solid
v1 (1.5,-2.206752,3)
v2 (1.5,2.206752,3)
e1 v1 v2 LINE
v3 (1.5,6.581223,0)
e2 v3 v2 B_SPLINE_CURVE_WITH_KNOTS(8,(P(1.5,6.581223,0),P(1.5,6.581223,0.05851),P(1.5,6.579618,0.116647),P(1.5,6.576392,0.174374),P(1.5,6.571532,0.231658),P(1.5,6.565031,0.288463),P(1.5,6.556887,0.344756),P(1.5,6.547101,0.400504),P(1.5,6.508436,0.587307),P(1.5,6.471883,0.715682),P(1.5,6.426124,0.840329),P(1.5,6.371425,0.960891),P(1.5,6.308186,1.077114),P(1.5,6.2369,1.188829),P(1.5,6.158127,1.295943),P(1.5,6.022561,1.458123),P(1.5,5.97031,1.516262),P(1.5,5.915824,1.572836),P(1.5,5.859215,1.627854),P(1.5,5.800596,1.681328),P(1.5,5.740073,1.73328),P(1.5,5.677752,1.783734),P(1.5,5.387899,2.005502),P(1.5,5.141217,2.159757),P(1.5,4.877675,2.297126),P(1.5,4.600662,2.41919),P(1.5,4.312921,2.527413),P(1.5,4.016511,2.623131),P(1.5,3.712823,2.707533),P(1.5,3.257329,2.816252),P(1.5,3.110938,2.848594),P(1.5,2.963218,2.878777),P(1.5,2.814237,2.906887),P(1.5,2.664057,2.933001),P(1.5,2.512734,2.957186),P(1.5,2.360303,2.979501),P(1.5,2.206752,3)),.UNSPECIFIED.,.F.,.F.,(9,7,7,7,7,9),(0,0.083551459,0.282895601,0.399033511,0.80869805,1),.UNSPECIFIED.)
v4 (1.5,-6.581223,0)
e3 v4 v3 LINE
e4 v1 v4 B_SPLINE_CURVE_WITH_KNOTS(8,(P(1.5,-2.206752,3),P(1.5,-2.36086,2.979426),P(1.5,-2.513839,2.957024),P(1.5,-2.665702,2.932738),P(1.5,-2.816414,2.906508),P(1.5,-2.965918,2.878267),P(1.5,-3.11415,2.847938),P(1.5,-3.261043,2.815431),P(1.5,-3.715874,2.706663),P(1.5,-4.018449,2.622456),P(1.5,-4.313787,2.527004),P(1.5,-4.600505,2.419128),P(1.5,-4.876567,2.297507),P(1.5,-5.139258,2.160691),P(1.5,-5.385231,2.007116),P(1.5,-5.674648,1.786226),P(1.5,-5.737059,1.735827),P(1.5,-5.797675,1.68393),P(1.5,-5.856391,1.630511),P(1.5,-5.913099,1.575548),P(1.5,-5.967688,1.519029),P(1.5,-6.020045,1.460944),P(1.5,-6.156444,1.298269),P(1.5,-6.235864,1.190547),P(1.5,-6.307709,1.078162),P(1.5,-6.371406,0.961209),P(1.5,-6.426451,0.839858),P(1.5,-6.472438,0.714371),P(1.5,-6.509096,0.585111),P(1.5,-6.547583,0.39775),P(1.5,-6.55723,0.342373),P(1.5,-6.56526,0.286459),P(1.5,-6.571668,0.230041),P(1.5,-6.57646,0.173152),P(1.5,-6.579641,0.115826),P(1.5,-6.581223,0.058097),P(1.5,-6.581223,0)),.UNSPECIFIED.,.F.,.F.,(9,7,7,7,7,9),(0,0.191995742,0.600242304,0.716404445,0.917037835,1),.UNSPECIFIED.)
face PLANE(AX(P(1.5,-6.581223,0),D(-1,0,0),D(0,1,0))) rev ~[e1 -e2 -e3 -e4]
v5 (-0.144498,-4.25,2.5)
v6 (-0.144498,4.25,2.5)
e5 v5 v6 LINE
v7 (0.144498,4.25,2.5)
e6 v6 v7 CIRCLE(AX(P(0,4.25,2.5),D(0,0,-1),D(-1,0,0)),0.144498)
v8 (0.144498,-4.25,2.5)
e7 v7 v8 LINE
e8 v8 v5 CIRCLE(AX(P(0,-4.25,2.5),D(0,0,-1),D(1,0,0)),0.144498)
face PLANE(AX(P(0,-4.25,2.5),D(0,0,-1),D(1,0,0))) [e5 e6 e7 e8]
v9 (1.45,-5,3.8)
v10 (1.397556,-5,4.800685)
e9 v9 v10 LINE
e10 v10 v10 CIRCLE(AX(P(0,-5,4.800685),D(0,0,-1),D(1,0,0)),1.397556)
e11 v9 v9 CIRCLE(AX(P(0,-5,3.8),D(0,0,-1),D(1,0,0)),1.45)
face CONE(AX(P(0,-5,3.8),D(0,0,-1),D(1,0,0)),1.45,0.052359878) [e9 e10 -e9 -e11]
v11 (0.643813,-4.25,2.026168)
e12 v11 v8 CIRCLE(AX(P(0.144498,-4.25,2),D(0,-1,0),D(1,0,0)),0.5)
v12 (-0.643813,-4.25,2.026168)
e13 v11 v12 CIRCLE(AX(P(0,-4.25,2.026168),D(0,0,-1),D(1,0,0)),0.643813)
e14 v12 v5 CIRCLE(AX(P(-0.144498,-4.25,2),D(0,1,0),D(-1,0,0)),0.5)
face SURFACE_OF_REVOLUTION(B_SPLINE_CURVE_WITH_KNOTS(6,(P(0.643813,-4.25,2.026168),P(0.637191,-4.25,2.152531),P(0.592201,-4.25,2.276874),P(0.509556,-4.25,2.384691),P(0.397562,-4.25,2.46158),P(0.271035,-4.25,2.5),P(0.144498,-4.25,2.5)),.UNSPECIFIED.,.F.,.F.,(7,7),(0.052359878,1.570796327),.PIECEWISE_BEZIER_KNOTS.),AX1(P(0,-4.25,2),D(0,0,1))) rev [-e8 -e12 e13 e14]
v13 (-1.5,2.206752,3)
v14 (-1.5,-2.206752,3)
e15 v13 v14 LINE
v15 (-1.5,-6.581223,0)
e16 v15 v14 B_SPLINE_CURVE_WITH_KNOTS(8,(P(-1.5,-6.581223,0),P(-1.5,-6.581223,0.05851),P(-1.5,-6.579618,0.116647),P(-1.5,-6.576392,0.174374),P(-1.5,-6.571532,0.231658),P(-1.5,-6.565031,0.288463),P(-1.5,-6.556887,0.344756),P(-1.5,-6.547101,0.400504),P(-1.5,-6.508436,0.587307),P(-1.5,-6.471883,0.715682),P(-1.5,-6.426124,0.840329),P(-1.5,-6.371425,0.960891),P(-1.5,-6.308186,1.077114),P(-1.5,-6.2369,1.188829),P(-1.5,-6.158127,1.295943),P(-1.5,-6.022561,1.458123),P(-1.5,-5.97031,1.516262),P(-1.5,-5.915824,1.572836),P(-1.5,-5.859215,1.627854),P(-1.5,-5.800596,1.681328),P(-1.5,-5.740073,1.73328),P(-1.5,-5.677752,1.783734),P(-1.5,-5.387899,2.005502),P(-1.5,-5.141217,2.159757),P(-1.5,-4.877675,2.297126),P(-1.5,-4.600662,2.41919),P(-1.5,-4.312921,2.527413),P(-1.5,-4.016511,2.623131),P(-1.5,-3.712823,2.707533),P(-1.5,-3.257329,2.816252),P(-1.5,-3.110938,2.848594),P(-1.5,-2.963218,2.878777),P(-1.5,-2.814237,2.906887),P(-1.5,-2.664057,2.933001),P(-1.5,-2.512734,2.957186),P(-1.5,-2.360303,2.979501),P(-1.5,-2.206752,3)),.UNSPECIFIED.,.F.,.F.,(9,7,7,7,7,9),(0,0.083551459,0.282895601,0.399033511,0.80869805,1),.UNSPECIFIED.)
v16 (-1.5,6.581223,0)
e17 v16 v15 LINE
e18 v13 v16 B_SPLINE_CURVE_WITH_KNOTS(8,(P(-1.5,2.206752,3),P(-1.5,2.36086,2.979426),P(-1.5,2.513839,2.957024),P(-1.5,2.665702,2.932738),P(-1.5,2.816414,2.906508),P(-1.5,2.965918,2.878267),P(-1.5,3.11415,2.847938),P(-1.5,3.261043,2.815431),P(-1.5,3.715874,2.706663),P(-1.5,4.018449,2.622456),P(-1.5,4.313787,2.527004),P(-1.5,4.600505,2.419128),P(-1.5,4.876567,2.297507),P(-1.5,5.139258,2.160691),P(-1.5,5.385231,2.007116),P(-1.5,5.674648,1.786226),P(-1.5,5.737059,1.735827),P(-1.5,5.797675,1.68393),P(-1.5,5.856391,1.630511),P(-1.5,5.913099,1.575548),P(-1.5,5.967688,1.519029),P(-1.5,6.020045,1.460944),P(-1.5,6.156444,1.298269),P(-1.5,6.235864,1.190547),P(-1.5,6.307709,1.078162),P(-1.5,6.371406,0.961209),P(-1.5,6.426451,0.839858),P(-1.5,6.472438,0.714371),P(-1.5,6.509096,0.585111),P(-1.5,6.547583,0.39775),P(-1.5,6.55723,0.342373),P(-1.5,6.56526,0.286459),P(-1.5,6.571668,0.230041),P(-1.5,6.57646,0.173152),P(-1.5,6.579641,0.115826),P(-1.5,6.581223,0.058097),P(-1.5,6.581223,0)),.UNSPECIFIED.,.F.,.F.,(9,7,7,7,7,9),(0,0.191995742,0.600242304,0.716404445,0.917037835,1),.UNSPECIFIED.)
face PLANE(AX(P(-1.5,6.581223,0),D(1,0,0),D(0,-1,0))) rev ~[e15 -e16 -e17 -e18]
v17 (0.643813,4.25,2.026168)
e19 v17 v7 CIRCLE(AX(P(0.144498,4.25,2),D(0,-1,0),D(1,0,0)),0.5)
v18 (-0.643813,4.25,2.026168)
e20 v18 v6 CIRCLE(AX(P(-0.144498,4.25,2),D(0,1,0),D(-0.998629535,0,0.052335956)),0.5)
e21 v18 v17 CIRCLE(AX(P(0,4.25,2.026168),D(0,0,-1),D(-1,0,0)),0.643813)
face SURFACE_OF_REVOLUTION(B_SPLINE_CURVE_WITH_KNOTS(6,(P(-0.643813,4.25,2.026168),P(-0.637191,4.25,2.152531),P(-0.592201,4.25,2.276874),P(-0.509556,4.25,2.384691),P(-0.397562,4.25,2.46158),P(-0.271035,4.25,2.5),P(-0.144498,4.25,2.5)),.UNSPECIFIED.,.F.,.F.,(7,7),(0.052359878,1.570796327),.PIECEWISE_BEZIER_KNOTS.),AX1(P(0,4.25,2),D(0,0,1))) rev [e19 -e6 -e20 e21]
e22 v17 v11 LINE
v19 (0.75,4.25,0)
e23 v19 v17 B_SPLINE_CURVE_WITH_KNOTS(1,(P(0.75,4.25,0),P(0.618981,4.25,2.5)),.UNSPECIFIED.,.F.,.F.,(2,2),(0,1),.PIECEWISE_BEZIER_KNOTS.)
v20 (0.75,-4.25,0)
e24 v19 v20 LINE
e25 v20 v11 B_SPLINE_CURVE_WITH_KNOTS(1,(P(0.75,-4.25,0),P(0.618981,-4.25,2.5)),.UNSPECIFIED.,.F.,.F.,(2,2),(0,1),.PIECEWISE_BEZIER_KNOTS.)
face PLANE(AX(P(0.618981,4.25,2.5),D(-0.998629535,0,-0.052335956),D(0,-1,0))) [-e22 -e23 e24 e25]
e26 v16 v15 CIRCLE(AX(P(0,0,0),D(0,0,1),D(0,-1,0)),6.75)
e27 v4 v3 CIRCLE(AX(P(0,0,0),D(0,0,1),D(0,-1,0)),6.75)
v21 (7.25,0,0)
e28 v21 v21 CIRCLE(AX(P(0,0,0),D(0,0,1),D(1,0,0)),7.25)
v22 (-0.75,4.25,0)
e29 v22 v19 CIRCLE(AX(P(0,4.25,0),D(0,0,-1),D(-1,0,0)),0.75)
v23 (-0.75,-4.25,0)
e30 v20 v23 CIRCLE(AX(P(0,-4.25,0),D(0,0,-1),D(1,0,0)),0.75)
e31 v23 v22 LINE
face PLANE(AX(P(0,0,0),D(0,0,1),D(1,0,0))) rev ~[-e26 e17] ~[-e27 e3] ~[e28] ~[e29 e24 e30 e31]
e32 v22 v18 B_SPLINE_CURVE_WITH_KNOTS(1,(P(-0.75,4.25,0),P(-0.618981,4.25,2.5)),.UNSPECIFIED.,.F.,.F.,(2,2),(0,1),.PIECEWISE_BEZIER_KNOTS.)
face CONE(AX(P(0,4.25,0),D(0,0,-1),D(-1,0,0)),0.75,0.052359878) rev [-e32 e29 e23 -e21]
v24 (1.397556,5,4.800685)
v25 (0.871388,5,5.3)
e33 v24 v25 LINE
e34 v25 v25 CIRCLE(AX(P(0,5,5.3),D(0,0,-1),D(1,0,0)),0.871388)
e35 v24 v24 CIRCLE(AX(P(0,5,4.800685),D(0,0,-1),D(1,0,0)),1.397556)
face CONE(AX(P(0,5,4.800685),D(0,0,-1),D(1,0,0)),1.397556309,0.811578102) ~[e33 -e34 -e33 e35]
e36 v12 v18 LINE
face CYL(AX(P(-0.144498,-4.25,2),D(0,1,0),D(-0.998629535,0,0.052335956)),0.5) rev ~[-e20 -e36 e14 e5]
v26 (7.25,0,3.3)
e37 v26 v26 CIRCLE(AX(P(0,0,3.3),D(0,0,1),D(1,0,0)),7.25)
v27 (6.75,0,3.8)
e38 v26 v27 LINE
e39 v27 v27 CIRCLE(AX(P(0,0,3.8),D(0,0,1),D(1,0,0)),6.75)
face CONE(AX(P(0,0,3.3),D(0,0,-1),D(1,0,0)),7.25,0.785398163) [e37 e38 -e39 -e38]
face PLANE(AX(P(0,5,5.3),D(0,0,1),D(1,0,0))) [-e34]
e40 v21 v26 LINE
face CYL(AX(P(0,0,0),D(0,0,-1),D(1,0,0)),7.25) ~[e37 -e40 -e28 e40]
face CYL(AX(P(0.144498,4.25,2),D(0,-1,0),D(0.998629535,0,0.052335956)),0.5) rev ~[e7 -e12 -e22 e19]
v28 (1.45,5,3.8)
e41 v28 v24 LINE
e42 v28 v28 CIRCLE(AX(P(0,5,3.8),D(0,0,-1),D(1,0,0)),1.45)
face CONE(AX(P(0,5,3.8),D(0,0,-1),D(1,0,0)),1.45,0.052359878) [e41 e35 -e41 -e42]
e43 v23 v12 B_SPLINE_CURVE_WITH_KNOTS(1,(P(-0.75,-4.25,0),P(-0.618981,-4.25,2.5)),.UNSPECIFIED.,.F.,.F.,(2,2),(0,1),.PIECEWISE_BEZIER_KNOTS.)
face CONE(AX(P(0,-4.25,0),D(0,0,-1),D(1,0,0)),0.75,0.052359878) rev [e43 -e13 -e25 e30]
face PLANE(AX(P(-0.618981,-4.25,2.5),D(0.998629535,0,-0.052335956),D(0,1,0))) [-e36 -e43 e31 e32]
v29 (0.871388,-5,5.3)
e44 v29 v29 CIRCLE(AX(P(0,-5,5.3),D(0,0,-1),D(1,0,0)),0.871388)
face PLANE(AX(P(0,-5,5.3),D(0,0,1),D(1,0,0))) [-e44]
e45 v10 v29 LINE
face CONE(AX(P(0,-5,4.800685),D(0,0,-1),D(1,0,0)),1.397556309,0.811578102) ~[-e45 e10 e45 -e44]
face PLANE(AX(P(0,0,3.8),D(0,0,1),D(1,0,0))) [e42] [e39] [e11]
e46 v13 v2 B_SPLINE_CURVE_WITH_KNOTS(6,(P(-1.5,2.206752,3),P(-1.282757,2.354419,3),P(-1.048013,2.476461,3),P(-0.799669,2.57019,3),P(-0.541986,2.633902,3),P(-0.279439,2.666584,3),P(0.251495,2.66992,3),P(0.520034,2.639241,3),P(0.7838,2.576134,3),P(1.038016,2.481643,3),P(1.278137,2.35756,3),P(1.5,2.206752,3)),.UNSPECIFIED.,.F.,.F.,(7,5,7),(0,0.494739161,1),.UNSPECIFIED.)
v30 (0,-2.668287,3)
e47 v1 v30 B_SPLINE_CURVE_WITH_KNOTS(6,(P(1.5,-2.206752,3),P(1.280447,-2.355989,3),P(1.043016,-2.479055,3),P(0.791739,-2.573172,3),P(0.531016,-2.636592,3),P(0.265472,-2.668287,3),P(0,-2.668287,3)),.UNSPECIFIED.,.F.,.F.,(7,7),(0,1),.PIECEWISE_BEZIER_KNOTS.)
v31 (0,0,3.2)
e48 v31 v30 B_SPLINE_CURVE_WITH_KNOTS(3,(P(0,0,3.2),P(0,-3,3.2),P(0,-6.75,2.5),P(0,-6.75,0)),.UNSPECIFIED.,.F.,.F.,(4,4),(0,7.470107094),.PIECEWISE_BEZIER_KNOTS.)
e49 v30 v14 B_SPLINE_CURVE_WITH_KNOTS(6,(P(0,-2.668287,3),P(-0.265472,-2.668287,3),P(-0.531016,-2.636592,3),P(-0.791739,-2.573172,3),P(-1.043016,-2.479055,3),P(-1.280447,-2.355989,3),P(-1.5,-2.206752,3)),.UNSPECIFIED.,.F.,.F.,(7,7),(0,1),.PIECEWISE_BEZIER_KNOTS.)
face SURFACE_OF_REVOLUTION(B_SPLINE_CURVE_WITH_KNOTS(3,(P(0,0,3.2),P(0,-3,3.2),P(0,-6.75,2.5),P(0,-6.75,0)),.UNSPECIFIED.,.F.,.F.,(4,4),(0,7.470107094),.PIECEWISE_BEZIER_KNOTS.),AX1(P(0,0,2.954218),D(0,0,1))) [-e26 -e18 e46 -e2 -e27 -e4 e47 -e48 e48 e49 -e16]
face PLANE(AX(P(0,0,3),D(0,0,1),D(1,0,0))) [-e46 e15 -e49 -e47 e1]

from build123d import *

# Parameters (mm, degrees)
F0_R      = 7.25
F1_DEPTH  = 3.8
F2_R      = 1.45
F3_DEPTH  = 1.5
F3_TAPER  = 3
F8_DEPTH  = 3
F10_DEPTH = 2.5
F10_TAPER = 3
F11_R     = 0.5
F12_SIZE  = 0.5


# Not quite as in the source:
# - a fillet or chamfer that OpenCascade refuses, or shapes differently, is made with other operations: its cross-section is extruded or revolved along the edge and cut away or added


with BuildPart() as f1:
    # F0 (on Top) → F1 (new body)
    with BuildSketch(Plane.XY):
        Circle(F0_R)
    extrude(amount=F1_DEPTH)

    # F2 (on face) → F3 (join)
    with BuildSketch(Plane.XY.offset(3.8)):
        with Locations((0, 5)):
            Circle(F2_R)
        with Locations((0, -5)):
            Circle(F2_R)
    extrude(amount=F3_DEPTH, taper=F3_TAPER)

    # F4: chamfer of 0.5 on 2 edges, made by hand

    # F4_s1 → F4_t2 (revolve, cut)
    with BuildSketch(Plane.XZ.offset(-5)):
        Polygon((1.3975563092, 4.8006852326), (0.8713883311, 5.3), (1.3713883311, 5.3), align=None)
    revolve(axis=Axis((0, 5, 5.3), (0, 0, -1)), mode=Mode.SUBTRACT)

    # F4_s3 → F4_t4 (revolve, cut)
    with BuildSketch(Plane.XZ.offset(5)):
        Polygon((1.3975563092, 4.8006852326), (0.8713883311, 5.3), (1.3713883311, 5.3), align=None)
    revolve(axis=Axis((0, -5, 5.3), (0, 0, -1)), mode=Mode.SUBTRACT)

    # F5 (on Right) → F6 (revolve, cut)
    with BuildSketch(Plane.YZ):
        with BuildLine():
            add(Edge.make_bspline(
                [(0, 3.2), (-3, 3.2), (-6.75, 2.5), (-6.75, 0)],
                knots=[0, 0, 0, 0, 7.4701070943, 7.4701070943, 7.4701070943, 7.4701070943], degree=3))
            Line((-6.75, 0), (0, 0))
            Line((0, 0), (0, 3.2))
        make_face()
    revolve(axis=Axis((0, 0, 2.9542176053), (0, 0, 1)), mode=Mode.SUBTRACT)

    # F7 (on face) → F8 (join)
    with BuildSketch(Plane.XY):
        with BuildLine():
            Line((-1.5, 6.5812232905), (-1.5, -6.5812232905))
            ThreePointArc((-1.5, -6.5812232905), (0, -6.75), (1.5, -6.5812232905))
            Line((1.5, -6.5812232905), (1.5, 6.5812232905))
            ThreePointArc((1.5, 6.5812232905), (0, 6.75), (-1.5, 6.5812232905))
        make_face()
    extrude(amount=F8_DEPTH)

    # F9 (on face) → F10 (cut)
    with BuildSketch(Plane(origin=(0, 0, 0), x_dir=(1, 0, 0), z_dir=(0, 0, -1))):
        with BuildLine():
            ThreePointArc((0.75, 4.25), (0, 5), (-0.75, 4.25))
            Line((-0.75, 4.25), (-0.75, -4.25))
            ThreePointArc((-0.75, -4.25), (0, -5), (0.75, -4.25))
            Line((0.75, -4.25), (0.75, 4.25))
        make_face()
    extrude(amount=-F10_DEPTH, taper=F10_TAPER, mode=Mode.SUBTRACT)

    # F11
    f11_edges = [f1.edges().sort_by_distance(p)[0] for p in [
        (0, -4.868981, 2.5),
        (-0.618981, 0, 2.5),
        (0, 4.868981, 2.5),
        (0.618981, 0, 2.5),
    ]]
    fillet(f11_edges, radius=F11_R)

    # F12
    f12_edges = [f1.edges().sort_by_distance(p)[0] for p in [
        (-7.25, 0, 3.8),
    ]]
    chamfer(f12_edges, length=F12_SIZE)


solid = f1.part
